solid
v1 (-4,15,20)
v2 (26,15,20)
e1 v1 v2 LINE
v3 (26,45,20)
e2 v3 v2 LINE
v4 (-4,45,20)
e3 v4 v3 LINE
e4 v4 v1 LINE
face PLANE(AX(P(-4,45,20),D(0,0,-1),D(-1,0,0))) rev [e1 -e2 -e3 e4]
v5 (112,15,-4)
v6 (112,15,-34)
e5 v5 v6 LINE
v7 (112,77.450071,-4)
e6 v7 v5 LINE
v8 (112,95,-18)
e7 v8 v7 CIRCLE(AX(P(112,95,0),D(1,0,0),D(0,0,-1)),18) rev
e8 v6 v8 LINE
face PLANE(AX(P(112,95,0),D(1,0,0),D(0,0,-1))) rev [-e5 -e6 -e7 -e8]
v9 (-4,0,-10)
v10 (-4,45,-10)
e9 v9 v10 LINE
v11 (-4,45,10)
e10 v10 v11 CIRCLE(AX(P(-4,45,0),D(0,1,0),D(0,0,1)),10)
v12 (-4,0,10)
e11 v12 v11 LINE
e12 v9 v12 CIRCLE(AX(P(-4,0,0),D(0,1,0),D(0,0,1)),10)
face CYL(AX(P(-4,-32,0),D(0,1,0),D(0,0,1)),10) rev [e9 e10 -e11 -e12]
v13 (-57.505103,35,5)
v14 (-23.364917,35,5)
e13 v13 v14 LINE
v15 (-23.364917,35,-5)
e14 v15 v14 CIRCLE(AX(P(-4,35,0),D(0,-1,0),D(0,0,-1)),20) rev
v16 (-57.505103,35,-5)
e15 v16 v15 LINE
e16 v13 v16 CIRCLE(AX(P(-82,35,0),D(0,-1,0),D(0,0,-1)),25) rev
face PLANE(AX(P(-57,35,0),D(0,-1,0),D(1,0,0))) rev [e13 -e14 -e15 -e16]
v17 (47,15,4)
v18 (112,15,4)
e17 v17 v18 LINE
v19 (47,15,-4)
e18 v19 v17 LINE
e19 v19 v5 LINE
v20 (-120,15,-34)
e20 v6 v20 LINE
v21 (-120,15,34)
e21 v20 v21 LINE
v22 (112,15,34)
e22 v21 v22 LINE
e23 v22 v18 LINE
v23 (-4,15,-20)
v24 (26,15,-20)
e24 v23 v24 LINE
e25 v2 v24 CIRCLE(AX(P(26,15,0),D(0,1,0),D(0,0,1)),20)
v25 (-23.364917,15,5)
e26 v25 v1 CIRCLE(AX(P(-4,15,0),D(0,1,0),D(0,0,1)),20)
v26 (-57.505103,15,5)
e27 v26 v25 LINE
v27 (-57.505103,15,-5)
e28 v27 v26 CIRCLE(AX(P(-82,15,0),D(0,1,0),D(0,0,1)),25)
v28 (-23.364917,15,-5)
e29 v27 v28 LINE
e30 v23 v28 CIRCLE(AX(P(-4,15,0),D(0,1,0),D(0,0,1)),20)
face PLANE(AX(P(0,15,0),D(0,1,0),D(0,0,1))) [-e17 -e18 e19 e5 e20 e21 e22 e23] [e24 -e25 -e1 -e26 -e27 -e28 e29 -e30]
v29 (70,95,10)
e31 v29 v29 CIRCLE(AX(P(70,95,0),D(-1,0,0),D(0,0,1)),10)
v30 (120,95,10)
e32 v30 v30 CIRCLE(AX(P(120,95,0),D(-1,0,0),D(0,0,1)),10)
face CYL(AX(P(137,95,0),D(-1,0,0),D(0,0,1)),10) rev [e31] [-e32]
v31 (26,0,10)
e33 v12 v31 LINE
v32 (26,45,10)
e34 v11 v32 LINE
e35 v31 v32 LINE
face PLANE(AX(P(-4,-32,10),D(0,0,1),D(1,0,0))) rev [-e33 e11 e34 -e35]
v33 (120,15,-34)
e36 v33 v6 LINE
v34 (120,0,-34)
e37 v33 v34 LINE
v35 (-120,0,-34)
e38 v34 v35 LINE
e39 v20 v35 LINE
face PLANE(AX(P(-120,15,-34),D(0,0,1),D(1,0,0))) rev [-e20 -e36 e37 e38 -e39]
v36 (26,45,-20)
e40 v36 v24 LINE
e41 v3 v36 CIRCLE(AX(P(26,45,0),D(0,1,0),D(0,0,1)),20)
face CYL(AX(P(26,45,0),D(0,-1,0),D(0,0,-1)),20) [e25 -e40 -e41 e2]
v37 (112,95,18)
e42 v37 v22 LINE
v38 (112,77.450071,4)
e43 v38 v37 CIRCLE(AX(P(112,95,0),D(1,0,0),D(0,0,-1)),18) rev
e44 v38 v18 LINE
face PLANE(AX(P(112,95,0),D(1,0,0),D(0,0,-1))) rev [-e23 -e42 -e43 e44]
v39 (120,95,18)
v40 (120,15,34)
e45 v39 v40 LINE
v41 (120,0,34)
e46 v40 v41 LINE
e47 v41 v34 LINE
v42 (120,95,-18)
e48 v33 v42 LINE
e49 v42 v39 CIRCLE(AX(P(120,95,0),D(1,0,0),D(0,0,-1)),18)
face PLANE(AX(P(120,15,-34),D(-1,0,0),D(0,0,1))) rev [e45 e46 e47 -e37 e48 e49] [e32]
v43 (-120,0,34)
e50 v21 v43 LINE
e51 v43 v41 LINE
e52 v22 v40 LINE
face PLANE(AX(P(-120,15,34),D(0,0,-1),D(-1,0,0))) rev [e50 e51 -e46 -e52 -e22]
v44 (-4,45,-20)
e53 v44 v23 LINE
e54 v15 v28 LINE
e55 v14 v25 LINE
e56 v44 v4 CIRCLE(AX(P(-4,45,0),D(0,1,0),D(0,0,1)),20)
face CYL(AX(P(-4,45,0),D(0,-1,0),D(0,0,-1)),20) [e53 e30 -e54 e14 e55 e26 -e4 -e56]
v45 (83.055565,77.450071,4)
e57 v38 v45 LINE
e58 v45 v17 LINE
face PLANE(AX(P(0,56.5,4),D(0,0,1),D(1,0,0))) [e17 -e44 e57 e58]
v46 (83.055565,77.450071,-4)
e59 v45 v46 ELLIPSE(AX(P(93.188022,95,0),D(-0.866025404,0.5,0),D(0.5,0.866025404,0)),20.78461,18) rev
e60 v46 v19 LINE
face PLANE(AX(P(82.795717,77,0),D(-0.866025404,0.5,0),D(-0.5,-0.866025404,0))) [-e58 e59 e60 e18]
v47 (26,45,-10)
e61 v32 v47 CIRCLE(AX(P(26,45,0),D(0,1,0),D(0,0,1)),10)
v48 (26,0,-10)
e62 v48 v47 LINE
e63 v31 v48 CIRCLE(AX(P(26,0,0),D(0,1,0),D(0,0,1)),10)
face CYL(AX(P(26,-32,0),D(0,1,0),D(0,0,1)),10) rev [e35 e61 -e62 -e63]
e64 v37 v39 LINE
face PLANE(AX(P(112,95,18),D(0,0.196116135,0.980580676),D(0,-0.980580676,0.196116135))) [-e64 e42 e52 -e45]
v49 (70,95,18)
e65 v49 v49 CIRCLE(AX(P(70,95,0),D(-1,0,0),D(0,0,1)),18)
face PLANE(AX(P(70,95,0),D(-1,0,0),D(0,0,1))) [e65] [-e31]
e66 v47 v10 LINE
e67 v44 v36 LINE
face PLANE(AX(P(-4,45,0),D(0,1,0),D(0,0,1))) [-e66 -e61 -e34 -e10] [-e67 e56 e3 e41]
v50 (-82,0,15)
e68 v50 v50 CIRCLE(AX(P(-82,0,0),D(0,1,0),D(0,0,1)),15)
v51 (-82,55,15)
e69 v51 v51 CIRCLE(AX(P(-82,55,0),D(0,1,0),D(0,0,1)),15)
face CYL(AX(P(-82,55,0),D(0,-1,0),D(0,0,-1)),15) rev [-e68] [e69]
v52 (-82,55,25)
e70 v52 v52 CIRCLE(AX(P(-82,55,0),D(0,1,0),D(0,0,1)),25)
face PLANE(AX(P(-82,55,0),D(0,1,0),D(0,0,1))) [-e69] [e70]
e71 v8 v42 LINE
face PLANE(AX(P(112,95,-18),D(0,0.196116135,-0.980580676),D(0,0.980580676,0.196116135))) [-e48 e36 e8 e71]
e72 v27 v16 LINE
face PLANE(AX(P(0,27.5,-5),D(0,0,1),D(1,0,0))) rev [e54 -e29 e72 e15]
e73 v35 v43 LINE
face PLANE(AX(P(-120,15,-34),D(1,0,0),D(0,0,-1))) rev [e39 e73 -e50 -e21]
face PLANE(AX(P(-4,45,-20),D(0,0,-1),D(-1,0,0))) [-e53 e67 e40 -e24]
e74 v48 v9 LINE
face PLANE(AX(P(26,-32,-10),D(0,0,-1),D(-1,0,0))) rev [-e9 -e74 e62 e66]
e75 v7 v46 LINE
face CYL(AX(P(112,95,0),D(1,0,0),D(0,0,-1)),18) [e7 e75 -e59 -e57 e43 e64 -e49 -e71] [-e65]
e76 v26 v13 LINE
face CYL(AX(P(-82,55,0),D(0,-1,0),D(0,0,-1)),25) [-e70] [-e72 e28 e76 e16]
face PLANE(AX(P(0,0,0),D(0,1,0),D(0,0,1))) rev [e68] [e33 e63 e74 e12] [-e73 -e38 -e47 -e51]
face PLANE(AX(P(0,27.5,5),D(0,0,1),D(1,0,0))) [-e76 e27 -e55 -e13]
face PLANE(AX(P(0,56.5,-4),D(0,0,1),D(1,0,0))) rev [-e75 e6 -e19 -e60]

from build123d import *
from build123d.topology import SkipClean

# Parameters (mm, degrees)
SKETCH2_W           = 240
SKETCH2_H           = 68
BOSS_EXTRUDE1_DEPTH = 15
SKETCH4_R           = 25
SKETCH4_R_2         = 15
BOSS_EXTRUDE4_DEPTH = 40
CUT_EXTRUDE2_START  = -40
SKETCH7_R           = 15
CUT_EXTRUDE2_DEPTH  = 40
BOSS_EXTRUDE5_DEPTH = 30
CUT_EXTRUDE3_DEPTH  = 77
RIB3_REACH          = 138.312
SKETCH11_WALL_W     = 307.624283584
SKETCH11_WALL_H     = 10
BOSS_EXTRUDE6_DEPTH = 8
SKETCH13_R          = 18
BOSS_EXTRUDE7_DEPTH = 42
SKETCH14_R          = 10
CUT_EXTRUDE4_DEPTH  = 67
RIB14_REACH         = 170.3
SKETCH19_WALL_W     = 410.192086974
SKETCH19_WALL_H     = 8


with BuildPart() as part:
    # Sketch2 → Boss-Extrude1 (new body)
    with BuildSketch(Plane(origin=(0, 0, 0), x_dir=(1, 0, 0), z_dir=(0, 1, 0))):
        Rectangle(SKETCH2_W, SKETCH2_H)
    extrude(amount=BOSS_EXTRUDE1_DEPTH)

    # Sketch4 → Boss-Extrude4 (add)
    with BuildSketch(Plane(origin=(0, 15, 0), x_dir=(1, 0, 0), z_dir=(0, 1, 0))):
        with Locations((-82, 0)):
            Circle(SKETCH4_R)
        with Locations((-82, 0)):
            Circle(SKETCH4_R_2, mode=Mode.SUBTRACT)
    extrude(amount=BOSS_EXTRUDE4_DEPTH)

    # Sketch7 → Cut-Extrude2 (cut)
    with BuildSketch(Plane(origin=(0, 15, 0), x_dir=(1, 0, 0), z_dir=(0, 1, 0)).offset(CUT_EXTRUDE2_START)):
        with Locations((-82, 0)):
            Circle(SKETCH7_R)
    extrude(amount=CUT_EXTRUDE2_DEPTH, mode=Mode.SUBTRACT)

    # Sketch8 → Boss-Extrude5 (add)
    with BuildSketch(Plane(origin=(0, 15, 0), x_dir=(1, 0, 0), z_dir=(0, 1, 0))):
        with BuildLine():
            Line((-4, 20), (26, 20))
            ThreePointArc((26, 20), (46, 0), (26, -20))
            Line((26, -20), (-4, -20))
            ThreePointArc((-4, -20), (-24, 0), (-4, 20))
        make_face()
    extrude(amount=BOSS_EXTRUDE5_DEPTH)

    # Sketch9 → Cut-Extrude3 (cut)
    with BuildSketch(Plane(origin=(0, 45, 0), x_dir=(1, 0, 0), z_dir=(0, 1, 0))):
        with BuildLine():
            Line((-4, -10), (26, -10))
            ThreePointArc((26, -10), (36, 0), (26, 10))
            Line((26, 10), (-4, 10))
            ThreePointArc((-4, 10), (-14, 0), (-4, -10))
        make_face()
    extrude(amount=-CUT_EXTRUDE3_DEPTH, mode=Mode.SUBTRACT)

    # Sketch11 wall → Rib3 (add, up to next)
    with BuildSketch(Plane(origin=(-40.5, 35, 0), x_dir=(1, 0, 0), z_dir=(0, 1, 0)), mode=Mode.PRIVATE) as rib3_sk1:
        Rectangle(SKETCH11_WALL_W, SKETCH11_WALL_H)
    rib3_tool1 = extrude(rib3_sk1.sketch, amount=-RIB3_REACH, mode=Mode.PRIVATE) - part.part
    add(rib3_tool1.solids().sort_by_distance((-40.5, 35, 0))[0])

    # Sketch12 → Boss-Extrude6 (add)
    with BuildSketch(Plane(origin=(120, 0, 0), x_dir=(0, 0, -1), z_dir=(1, 0, 0))):
        with BuildLine():
            Line((-18, 95), (-34, 15))
            Line((-34, 15), (34, 15))
            Line((34, 15), (18, 95))
            ThreePointArc((18, 95), (0, 113), (-18, 95))
        make_face()
    extrude(amount=-BOSS_EXTRUDE6_DEPTH)

    # Sketch13 → Boss-Extrude7 (add)
    with SkipClean():  # the faces are left unmerged after this step: merging them gives an invalid solid
        with BuildSketch(Plane.ZY.offset(-112)):
            with Locations((0, 95)):
                Circle(SKETCH13_R)
        extrude(amount=BOSS_EXTRUDE7_DEPTH)
    add(part.part.scale(1), mode=Mode.REPLACE)  # the faces are merged on a copy

    # Sketch14 → Cut-Extrude4 (cut)
    with BuildSketch(Plane.ZY.offset(-70)):
        with Locations((0, 95)):
            Circle(SKETCH14_R)
    extrude(amount=-CUT_EXTRUDE4_DEPTH, mode=Mode.SUBTRACT)

    # Sketch19 wall → Rib14 (add, up to next)
    with BuildSketch(Plane(origin=(64.897858345, 46, 0), x_dir=(-0.500000000003, -0.866025403783, 0), z_dir=(0.866025403783, -0.500000000003, 0)), mode=Mode.PRIVATE) as rib14_sk1:
        Rectangle(SKETCH19_WALL_W, SKETCH19_WALL_H)
    rib14_tool1 = extrude(rib14_sk1.sketch, amount=RIB14_REACH, mode=Mode.PRIVATE) - part.part
    add(rib14_tool1.solids().sort_by_distance((64.897858345, 46, 0))[0])


solid = part.part
